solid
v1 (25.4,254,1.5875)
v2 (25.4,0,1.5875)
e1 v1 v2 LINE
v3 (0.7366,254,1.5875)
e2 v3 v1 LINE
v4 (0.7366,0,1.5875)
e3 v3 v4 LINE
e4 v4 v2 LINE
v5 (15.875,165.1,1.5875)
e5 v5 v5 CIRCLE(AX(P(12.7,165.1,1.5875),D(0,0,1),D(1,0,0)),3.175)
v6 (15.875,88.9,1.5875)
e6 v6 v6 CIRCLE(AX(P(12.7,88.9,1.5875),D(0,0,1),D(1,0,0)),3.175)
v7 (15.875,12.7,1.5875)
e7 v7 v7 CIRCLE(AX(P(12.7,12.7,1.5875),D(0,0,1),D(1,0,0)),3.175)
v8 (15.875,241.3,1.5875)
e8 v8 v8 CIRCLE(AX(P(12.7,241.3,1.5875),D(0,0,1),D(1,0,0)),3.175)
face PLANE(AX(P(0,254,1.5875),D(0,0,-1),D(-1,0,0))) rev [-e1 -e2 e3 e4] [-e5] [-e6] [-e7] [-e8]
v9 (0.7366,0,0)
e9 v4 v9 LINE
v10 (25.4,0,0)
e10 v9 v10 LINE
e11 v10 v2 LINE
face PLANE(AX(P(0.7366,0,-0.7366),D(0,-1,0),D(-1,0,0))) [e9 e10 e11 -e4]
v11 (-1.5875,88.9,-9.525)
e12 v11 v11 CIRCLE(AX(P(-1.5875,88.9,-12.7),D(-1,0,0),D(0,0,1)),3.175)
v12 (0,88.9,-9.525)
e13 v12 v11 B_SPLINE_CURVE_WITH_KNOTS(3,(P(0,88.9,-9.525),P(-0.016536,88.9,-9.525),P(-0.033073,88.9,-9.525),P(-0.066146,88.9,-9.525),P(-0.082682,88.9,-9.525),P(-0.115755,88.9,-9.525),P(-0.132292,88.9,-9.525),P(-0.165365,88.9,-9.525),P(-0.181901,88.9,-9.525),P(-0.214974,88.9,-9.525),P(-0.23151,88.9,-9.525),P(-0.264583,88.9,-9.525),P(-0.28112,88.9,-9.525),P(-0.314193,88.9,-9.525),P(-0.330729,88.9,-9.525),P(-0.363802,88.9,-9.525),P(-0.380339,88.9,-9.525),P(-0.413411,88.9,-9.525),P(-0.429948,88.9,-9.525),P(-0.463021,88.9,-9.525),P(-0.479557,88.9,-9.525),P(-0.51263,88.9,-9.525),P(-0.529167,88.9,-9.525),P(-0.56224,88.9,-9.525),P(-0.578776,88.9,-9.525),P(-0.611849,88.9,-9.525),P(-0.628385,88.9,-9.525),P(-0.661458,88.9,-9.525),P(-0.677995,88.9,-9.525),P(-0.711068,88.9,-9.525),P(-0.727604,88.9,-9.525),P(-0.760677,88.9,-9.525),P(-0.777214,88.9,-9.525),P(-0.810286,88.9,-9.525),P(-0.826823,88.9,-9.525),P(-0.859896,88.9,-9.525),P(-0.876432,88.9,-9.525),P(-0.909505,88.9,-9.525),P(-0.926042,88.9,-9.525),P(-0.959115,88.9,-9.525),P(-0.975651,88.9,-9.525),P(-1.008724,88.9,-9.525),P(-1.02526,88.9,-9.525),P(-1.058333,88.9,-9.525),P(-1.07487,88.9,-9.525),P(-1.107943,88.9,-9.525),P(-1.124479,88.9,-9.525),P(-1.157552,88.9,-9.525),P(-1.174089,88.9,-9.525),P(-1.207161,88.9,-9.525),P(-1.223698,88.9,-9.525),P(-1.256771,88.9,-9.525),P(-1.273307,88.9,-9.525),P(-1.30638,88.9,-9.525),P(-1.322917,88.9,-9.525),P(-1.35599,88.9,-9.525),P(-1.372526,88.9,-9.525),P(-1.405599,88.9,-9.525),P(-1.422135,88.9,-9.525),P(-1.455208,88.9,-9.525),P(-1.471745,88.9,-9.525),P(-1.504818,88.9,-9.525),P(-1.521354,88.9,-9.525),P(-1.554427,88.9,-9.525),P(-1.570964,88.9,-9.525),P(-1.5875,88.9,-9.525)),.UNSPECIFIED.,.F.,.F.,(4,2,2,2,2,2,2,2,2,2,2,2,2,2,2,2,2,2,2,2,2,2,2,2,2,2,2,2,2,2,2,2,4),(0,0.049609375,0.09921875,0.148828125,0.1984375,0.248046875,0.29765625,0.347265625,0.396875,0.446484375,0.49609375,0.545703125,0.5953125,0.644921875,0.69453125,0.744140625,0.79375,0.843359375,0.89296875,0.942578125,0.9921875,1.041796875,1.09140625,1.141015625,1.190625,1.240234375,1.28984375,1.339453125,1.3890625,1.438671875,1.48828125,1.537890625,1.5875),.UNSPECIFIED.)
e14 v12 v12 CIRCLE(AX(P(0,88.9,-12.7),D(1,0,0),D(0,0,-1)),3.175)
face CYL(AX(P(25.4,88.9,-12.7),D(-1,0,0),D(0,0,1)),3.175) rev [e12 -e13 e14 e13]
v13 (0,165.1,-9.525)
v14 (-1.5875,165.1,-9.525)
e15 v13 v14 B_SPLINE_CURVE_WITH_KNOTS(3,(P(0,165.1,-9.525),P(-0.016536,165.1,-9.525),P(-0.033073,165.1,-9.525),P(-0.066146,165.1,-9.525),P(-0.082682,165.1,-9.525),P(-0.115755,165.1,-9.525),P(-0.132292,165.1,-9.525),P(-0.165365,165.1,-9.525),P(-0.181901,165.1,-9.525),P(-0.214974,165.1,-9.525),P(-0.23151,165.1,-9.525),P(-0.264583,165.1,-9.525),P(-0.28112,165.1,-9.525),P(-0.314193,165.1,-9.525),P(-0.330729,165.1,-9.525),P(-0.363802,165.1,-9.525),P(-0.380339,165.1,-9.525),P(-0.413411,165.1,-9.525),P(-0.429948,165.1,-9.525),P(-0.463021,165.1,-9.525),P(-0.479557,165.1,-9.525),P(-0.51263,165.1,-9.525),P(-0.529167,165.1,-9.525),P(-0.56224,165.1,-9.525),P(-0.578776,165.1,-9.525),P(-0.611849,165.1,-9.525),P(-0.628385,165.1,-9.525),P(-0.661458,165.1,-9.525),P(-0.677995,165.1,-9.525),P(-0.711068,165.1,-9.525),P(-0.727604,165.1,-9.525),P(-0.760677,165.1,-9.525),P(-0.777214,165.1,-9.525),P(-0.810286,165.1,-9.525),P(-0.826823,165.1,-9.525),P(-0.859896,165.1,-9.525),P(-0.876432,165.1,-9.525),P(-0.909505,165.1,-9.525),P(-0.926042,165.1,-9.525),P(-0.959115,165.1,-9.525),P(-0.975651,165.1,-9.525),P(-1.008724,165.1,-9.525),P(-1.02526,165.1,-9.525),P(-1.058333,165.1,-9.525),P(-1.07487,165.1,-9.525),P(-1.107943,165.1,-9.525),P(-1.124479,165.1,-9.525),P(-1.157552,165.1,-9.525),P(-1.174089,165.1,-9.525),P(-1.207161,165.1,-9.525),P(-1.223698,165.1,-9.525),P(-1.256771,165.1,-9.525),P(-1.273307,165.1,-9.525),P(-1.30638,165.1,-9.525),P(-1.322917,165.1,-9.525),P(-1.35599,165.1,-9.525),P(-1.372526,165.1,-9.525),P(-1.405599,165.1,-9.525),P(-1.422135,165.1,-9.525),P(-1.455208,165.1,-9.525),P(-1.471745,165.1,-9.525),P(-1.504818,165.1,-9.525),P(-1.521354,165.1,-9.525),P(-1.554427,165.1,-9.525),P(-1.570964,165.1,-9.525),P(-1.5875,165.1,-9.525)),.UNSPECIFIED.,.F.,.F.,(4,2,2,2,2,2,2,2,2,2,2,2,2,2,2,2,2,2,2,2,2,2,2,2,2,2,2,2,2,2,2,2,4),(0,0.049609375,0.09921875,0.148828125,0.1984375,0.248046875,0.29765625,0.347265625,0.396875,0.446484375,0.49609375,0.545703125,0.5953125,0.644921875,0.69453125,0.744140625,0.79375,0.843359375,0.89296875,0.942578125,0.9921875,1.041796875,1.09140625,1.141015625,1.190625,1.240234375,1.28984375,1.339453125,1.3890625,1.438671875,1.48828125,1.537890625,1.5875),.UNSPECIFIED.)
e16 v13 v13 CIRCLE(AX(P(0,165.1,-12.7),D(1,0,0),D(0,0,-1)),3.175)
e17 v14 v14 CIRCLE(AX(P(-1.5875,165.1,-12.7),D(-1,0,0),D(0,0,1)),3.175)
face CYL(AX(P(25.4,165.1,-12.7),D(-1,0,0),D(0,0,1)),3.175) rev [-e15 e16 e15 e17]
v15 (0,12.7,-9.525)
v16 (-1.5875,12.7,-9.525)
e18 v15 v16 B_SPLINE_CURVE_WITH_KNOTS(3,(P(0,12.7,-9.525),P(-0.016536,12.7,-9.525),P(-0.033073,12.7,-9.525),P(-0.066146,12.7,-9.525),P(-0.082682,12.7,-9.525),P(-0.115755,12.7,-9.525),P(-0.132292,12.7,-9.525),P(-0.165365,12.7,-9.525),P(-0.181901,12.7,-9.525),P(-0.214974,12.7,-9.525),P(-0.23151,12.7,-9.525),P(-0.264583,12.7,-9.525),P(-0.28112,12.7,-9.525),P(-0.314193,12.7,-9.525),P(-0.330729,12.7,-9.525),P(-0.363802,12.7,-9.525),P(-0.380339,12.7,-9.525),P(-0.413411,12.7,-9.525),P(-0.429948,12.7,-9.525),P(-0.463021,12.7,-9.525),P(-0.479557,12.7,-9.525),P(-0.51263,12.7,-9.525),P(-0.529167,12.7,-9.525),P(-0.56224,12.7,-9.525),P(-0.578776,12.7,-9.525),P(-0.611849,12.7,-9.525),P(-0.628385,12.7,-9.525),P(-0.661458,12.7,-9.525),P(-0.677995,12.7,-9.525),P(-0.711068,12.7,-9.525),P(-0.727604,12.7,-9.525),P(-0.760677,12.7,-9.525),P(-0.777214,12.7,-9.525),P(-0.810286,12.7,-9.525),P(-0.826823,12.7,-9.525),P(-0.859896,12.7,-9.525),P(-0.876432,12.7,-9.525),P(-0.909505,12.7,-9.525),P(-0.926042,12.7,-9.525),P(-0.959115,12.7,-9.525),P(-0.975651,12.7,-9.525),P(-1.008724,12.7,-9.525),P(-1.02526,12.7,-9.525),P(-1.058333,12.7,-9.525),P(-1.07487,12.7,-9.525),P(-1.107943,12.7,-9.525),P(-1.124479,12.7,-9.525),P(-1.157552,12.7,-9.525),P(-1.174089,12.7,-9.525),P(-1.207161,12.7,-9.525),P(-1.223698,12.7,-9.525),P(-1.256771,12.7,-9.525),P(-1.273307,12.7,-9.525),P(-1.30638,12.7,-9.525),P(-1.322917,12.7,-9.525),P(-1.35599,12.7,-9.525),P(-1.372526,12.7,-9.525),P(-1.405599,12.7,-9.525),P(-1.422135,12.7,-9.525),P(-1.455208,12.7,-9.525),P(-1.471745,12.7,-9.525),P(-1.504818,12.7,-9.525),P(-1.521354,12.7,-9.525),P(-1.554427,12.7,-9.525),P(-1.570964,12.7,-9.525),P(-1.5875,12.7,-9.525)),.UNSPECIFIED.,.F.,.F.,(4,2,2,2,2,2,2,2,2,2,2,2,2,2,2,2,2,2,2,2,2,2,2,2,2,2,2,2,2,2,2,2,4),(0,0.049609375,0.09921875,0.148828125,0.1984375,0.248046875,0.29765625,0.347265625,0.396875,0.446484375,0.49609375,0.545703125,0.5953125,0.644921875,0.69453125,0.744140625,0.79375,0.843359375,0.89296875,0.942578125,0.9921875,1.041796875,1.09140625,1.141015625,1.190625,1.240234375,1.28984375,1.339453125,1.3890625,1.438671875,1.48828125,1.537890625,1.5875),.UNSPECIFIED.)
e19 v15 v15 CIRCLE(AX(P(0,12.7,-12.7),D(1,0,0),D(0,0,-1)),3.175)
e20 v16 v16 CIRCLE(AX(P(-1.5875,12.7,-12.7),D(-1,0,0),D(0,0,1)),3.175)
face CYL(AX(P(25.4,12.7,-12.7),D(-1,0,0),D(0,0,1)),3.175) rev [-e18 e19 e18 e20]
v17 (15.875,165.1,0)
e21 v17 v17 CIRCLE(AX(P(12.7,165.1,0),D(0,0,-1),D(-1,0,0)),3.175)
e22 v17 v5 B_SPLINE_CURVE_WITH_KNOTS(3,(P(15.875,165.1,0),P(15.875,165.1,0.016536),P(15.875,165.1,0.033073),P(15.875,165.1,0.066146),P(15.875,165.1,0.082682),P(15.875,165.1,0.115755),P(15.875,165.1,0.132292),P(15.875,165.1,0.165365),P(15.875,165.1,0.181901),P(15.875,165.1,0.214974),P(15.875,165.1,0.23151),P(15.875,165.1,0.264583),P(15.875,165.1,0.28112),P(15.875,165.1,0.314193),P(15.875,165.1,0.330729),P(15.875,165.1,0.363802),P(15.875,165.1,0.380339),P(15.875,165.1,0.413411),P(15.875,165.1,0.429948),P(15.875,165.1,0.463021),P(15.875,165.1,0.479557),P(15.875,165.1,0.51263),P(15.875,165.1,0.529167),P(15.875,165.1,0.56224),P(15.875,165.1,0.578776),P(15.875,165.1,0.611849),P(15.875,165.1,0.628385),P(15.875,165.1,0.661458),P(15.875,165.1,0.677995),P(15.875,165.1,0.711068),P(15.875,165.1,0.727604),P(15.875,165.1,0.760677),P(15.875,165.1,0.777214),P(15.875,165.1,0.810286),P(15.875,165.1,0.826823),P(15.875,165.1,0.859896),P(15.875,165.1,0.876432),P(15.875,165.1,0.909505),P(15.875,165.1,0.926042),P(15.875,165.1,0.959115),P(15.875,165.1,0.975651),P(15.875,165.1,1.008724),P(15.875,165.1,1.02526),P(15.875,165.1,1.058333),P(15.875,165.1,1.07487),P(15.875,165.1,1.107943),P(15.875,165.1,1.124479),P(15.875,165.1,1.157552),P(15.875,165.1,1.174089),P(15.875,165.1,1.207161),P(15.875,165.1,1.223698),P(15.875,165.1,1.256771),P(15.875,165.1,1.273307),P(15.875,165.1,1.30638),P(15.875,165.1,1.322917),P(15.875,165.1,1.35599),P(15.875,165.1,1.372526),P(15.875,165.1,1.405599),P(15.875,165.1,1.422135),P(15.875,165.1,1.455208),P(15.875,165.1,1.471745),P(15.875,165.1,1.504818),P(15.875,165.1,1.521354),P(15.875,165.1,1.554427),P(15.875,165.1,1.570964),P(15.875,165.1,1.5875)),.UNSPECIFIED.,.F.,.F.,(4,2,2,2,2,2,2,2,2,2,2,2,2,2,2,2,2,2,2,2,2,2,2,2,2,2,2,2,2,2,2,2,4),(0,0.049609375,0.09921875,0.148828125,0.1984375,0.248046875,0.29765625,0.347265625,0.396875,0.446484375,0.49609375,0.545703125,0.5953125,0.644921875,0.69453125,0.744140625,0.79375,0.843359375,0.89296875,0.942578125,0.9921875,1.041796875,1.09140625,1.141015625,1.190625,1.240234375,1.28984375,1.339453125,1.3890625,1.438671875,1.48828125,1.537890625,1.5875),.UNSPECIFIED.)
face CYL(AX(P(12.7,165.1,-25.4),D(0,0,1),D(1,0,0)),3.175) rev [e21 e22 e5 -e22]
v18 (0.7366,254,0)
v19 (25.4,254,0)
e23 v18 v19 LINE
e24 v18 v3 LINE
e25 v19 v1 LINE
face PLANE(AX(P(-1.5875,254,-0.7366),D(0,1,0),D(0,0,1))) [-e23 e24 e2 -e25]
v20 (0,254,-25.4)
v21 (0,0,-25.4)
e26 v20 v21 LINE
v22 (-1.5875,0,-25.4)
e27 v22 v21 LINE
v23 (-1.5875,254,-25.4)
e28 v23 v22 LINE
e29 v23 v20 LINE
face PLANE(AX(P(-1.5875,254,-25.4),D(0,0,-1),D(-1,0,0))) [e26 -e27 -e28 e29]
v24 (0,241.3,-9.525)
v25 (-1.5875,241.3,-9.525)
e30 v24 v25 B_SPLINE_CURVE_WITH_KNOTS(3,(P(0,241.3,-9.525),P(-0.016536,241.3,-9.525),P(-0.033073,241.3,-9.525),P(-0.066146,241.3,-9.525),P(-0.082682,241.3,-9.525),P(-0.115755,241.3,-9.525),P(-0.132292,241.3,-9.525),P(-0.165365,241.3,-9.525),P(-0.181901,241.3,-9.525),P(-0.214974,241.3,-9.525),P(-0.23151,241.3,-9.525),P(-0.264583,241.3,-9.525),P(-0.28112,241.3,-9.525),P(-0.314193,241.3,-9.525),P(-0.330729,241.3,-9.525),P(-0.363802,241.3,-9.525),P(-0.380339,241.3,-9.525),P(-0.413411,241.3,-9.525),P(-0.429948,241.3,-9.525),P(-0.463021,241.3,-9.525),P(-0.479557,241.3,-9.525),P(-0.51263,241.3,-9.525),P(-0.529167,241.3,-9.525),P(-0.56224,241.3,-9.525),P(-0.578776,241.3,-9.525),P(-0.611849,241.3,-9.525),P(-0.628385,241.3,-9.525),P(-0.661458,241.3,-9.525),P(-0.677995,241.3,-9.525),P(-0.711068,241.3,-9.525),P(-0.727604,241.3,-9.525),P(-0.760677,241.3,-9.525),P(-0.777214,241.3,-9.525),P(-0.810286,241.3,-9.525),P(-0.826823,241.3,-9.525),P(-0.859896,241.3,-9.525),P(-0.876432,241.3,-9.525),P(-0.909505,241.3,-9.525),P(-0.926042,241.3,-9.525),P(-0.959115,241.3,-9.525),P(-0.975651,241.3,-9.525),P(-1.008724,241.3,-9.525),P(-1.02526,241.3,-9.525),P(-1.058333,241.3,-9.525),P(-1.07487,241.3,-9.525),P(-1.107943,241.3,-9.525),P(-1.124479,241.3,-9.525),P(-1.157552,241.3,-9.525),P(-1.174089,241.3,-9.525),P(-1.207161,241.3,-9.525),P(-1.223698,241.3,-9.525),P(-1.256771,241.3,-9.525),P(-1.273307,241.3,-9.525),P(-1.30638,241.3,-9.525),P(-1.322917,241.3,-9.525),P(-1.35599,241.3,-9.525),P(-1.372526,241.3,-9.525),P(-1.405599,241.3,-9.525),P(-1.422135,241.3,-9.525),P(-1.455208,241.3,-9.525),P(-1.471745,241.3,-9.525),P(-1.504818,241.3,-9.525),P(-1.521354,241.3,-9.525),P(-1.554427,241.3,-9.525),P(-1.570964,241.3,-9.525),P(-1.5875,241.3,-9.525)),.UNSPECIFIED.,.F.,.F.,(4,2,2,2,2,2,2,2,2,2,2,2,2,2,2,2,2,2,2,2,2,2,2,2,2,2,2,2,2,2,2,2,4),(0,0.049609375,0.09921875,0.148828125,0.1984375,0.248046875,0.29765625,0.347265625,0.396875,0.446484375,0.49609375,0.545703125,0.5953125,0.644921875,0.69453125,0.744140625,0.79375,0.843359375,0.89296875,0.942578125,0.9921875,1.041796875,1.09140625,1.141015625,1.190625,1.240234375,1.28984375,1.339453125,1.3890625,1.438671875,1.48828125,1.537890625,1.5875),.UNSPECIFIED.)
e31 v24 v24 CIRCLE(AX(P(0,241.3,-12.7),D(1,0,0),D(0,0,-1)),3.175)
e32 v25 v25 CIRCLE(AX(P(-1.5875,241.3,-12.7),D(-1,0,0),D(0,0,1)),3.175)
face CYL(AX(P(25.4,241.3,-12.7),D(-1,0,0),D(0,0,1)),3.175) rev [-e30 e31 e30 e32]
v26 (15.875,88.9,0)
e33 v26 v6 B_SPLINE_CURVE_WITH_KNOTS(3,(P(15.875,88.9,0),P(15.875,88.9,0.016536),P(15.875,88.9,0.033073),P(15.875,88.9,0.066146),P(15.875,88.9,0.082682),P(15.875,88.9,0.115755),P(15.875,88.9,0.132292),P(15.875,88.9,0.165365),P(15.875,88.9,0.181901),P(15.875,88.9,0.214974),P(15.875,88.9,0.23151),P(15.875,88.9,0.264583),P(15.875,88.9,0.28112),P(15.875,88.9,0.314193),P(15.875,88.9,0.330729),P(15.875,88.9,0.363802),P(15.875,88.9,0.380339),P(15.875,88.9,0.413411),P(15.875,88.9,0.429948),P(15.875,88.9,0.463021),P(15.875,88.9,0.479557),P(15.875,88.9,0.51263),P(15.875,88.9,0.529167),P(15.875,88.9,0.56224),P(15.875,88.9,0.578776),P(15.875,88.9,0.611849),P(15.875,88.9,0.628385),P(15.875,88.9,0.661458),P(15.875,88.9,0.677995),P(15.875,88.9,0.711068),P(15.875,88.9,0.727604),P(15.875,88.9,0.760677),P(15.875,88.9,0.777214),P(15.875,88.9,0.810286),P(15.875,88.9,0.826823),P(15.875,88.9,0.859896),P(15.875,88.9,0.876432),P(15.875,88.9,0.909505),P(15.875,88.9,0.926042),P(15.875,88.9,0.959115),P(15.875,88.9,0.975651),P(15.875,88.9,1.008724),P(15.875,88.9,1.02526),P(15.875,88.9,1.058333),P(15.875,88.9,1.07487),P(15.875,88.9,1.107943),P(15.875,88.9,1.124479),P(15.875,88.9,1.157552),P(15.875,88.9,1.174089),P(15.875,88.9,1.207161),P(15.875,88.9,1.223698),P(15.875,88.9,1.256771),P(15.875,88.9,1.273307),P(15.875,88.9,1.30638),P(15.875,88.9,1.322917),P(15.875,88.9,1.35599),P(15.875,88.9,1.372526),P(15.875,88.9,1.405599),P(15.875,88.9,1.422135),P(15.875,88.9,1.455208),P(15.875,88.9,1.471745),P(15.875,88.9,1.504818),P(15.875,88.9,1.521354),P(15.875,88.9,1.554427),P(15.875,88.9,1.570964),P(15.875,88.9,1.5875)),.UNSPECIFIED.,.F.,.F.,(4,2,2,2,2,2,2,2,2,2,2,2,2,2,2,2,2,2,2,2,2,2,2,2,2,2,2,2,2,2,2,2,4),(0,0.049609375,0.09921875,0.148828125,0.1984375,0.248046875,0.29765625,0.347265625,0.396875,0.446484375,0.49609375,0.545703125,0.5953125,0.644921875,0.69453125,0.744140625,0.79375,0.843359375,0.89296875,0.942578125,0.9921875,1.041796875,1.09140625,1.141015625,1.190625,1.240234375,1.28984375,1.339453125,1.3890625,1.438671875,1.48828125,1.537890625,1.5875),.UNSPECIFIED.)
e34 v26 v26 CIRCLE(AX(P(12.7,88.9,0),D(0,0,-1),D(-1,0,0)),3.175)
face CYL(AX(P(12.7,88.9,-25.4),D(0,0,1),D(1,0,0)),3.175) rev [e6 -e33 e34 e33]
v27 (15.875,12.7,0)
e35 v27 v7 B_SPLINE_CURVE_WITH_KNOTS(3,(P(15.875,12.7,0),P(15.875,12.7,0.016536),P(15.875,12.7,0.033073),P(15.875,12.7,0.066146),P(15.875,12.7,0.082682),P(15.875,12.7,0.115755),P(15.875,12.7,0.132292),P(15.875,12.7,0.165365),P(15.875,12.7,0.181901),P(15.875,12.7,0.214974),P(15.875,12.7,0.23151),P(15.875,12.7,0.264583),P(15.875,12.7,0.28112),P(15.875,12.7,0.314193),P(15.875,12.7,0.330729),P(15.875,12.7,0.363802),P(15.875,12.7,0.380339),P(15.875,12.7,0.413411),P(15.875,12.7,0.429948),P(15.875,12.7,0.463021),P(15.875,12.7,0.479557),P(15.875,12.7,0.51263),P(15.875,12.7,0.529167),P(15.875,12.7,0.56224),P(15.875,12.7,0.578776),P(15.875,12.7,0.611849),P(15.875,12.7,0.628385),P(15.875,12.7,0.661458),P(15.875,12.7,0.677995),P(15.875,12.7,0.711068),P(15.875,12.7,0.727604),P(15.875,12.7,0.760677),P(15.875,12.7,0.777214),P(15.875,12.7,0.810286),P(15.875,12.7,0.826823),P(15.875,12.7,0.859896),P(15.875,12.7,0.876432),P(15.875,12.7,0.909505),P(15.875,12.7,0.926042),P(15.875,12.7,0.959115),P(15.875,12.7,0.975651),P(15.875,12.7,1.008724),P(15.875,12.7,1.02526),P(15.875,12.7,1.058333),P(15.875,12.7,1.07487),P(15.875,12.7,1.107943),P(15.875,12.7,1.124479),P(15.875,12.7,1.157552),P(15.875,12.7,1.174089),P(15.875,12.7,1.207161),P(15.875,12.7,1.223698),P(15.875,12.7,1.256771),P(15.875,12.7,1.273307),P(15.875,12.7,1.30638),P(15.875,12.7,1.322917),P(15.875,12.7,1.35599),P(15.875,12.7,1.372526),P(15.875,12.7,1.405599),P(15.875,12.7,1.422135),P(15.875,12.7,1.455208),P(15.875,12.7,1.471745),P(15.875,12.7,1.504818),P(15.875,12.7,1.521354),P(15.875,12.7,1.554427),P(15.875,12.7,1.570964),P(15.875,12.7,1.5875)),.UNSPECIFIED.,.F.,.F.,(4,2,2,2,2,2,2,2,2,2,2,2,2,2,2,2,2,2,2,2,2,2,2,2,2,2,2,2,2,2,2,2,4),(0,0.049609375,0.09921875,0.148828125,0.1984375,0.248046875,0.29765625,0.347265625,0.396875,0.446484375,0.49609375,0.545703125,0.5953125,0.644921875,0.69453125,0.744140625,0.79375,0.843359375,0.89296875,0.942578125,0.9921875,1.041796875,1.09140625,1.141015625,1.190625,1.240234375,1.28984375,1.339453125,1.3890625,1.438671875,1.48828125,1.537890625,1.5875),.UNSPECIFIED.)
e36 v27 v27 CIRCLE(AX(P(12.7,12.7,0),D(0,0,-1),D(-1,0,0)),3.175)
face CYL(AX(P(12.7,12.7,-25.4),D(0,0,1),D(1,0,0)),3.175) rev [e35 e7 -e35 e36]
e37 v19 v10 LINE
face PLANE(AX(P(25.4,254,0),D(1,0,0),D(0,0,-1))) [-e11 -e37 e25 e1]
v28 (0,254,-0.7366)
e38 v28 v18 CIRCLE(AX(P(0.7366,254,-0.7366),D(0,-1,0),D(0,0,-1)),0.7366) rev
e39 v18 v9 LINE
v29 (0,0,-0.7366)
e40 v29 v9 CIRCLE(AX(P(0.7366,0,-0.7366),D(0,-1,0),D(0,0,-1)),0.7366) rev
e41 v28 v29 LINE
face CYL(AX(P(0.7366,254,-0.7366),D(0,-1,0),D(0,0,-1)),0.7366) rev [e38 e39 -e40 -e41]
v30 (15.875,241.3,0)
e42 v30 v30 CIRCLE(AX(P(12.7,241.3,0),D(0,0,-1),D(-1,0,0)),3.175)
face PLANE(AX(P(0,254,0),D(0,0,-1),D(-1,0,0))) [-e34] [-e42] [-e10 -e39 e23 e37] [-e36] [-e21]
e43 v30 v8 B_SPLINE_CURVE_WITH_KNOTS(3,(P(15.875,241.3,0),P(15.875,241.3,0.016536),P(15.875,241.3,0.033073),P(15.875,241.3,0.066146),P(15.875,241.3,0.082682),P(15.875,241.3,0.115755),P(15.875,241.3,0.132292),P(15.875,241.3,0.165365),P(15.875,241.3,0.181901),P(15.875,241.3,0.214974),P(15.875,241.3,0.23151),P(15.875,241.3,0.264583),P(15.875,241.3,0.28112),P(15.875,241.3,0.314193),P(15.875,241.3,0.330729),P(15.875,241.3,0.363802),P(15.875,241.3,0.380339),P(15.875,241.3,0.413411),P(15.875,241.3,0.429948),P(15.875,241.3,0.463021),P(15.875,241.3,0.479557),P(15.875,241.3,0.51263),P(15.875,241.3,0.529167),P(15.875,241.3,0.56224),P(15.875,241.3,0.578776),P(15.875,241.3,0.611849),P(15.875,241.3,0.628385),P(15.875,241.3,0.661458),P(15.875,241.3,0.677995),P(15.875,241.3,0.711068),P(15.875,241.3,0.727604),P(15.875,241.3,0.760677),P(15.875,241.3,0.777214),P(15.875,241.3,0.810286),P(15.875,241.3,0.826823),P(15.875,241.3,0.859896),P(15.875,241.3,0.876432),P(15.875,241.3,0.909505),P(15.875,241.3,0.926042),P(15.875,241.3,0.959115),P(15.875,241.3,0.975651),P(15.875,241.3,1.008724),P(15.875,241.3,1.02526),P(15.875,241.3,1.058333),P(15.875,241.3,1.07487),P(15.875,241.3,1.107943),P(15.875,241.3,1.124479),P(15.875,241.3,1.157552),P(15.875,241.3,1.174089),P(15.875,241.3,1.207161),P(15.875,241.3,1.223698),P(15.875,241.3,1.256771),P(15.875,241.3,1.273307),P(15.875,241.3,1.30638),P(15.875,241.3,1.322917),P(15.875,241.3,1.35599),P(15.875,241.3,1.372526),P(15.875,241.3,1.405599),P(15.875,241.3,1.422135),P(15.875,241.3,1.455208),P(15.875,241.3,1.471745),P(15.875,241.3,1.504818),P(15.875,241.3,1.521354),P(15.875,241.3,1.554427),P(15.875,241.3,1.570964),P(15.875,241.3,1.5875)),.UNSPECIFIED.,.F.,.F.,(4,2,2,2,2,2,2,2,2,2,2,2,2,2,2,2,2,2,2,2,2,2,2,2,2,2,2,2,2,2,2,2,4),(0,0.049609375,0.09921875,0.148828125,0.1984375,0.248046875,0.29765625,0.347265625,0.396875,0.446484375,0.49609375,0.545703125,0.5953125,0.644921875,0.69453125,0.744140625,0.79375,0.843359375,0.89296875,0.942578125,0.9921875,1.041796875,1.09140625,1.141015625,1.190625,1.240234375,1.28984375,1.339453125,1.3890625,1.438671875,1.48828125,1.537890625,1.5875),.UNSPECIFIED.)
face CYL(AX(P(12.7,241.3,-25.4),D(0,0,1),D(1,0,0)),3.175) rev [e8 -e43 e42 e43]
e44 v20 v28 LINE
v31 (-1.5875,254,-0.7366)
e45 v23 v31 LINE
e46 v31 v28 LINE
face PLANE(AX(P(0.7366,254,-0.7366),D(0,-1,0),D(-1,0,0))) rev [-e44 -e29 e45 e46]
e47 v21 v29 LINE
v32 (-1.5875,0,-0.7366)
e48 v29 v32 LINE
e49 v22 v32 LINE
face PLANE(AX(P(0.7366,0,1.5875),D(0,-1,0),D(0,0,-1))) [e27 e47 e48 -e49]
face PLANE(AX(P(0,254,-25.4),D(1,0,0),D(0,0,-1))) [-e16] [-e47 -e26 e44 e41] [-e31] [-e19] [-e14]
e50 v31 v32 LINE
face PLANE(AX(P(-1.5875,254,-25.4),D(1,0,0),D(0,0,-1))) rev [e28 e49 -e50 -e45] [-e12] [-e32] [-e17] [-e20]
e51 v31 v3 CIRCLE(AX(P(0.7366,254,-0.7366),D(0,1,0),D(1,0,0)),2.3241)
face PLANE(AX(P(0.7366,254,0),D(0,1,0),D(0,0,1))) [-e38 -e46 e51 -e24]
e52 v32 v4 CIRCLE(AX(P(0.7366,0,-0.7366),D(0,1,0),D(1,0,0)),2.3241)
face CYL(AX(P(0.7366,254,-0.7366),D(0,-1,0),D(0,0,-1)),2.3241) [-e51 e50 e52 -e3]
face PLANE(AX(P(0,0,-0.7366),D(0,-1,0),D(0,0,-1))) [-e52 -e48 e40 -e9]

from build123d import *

# Parameters (mm, degrees)
BASE_FLANGE1_DEPTH = 254
SKETCH6_R          = 3.175
CUT_EXTRUDE1_DEPTH = 257.689472235
SKETCH7_R          = 3.175
CUT_EXTRUDE2_DEPTH = 257.689472235


# Sheet-metal steps are written as plain solids
with BuildPart() as part:
    # Sketch1 → Base-Flange1 (new body)
    with BuildSketch(Plane(origin=(0, 0, 0), x_dir=(1, 0, 0), z_dir=(0, 1, 0))):
        with BuildLine():
            Line((0, 25.4), (0, 0.7366))
            ThreePointArc((0, 0.7366), (0.215745145, 0.215745145), (0.7366, 0))
            Line((0.7366, 0), (25.4, 0))
            Line((25.4, 0), (25.4, -1.5875))
            Line((25.4, -1.5875), (0.7366, -1.5875))
            ThreePointArc((0.7366, -1.5875), (-0.90678687, -0.90678687), (-1.5875, 0.7366))
            Line((-1.5875, 0.7366), (-1.5875, 25.4))
            Line((-1.5875, 25.4), (0, 25.4))
        make_face()
    extrude(amount=BASE_FLANGE1_DEPTH)

    # Sketch6 → Cut-Extrude1 (cut, through all)
    with BuildSketch(Plane.XY.offset(1.5875)):
        with Locations((12.7, 241.3)):
            Circle(SKETCH6_R)
        with Locations((12.7, 165.1)):
            Circle(SKETCH6_R)
        with Locations((12.7, 88.9)):
            Circle(SKETCH6_R)
        with Locations((12.7, 12.7)):
            Circle(SKETCH6_R)
    extrude(amount=-CUT_EXTRUDE1_DEPTH, mode=Mode.SUBTRACT)

    # Sketch7 → Cut-Extrude2 (cut, through all)
    with BuildSketch(Plane.ZY.offset(1.5875)):
        with Locations((-12.7, 241.3)):
            Circle(SKETCH7_R)
        with Locations((-12.7, 165.1)):
            Circle(SKETCH7_R)
        with Locations((-12.7, 88.9)):
            Circle(SKETCH7_R)
        with Locations((-12.7, 12.7)):
            Circle(SKETCH7_R)
    extrude(amount=-CUT_EXTRUDE2_DEPTH, mode=Mode.SUBTRACT)


solid = part.part
